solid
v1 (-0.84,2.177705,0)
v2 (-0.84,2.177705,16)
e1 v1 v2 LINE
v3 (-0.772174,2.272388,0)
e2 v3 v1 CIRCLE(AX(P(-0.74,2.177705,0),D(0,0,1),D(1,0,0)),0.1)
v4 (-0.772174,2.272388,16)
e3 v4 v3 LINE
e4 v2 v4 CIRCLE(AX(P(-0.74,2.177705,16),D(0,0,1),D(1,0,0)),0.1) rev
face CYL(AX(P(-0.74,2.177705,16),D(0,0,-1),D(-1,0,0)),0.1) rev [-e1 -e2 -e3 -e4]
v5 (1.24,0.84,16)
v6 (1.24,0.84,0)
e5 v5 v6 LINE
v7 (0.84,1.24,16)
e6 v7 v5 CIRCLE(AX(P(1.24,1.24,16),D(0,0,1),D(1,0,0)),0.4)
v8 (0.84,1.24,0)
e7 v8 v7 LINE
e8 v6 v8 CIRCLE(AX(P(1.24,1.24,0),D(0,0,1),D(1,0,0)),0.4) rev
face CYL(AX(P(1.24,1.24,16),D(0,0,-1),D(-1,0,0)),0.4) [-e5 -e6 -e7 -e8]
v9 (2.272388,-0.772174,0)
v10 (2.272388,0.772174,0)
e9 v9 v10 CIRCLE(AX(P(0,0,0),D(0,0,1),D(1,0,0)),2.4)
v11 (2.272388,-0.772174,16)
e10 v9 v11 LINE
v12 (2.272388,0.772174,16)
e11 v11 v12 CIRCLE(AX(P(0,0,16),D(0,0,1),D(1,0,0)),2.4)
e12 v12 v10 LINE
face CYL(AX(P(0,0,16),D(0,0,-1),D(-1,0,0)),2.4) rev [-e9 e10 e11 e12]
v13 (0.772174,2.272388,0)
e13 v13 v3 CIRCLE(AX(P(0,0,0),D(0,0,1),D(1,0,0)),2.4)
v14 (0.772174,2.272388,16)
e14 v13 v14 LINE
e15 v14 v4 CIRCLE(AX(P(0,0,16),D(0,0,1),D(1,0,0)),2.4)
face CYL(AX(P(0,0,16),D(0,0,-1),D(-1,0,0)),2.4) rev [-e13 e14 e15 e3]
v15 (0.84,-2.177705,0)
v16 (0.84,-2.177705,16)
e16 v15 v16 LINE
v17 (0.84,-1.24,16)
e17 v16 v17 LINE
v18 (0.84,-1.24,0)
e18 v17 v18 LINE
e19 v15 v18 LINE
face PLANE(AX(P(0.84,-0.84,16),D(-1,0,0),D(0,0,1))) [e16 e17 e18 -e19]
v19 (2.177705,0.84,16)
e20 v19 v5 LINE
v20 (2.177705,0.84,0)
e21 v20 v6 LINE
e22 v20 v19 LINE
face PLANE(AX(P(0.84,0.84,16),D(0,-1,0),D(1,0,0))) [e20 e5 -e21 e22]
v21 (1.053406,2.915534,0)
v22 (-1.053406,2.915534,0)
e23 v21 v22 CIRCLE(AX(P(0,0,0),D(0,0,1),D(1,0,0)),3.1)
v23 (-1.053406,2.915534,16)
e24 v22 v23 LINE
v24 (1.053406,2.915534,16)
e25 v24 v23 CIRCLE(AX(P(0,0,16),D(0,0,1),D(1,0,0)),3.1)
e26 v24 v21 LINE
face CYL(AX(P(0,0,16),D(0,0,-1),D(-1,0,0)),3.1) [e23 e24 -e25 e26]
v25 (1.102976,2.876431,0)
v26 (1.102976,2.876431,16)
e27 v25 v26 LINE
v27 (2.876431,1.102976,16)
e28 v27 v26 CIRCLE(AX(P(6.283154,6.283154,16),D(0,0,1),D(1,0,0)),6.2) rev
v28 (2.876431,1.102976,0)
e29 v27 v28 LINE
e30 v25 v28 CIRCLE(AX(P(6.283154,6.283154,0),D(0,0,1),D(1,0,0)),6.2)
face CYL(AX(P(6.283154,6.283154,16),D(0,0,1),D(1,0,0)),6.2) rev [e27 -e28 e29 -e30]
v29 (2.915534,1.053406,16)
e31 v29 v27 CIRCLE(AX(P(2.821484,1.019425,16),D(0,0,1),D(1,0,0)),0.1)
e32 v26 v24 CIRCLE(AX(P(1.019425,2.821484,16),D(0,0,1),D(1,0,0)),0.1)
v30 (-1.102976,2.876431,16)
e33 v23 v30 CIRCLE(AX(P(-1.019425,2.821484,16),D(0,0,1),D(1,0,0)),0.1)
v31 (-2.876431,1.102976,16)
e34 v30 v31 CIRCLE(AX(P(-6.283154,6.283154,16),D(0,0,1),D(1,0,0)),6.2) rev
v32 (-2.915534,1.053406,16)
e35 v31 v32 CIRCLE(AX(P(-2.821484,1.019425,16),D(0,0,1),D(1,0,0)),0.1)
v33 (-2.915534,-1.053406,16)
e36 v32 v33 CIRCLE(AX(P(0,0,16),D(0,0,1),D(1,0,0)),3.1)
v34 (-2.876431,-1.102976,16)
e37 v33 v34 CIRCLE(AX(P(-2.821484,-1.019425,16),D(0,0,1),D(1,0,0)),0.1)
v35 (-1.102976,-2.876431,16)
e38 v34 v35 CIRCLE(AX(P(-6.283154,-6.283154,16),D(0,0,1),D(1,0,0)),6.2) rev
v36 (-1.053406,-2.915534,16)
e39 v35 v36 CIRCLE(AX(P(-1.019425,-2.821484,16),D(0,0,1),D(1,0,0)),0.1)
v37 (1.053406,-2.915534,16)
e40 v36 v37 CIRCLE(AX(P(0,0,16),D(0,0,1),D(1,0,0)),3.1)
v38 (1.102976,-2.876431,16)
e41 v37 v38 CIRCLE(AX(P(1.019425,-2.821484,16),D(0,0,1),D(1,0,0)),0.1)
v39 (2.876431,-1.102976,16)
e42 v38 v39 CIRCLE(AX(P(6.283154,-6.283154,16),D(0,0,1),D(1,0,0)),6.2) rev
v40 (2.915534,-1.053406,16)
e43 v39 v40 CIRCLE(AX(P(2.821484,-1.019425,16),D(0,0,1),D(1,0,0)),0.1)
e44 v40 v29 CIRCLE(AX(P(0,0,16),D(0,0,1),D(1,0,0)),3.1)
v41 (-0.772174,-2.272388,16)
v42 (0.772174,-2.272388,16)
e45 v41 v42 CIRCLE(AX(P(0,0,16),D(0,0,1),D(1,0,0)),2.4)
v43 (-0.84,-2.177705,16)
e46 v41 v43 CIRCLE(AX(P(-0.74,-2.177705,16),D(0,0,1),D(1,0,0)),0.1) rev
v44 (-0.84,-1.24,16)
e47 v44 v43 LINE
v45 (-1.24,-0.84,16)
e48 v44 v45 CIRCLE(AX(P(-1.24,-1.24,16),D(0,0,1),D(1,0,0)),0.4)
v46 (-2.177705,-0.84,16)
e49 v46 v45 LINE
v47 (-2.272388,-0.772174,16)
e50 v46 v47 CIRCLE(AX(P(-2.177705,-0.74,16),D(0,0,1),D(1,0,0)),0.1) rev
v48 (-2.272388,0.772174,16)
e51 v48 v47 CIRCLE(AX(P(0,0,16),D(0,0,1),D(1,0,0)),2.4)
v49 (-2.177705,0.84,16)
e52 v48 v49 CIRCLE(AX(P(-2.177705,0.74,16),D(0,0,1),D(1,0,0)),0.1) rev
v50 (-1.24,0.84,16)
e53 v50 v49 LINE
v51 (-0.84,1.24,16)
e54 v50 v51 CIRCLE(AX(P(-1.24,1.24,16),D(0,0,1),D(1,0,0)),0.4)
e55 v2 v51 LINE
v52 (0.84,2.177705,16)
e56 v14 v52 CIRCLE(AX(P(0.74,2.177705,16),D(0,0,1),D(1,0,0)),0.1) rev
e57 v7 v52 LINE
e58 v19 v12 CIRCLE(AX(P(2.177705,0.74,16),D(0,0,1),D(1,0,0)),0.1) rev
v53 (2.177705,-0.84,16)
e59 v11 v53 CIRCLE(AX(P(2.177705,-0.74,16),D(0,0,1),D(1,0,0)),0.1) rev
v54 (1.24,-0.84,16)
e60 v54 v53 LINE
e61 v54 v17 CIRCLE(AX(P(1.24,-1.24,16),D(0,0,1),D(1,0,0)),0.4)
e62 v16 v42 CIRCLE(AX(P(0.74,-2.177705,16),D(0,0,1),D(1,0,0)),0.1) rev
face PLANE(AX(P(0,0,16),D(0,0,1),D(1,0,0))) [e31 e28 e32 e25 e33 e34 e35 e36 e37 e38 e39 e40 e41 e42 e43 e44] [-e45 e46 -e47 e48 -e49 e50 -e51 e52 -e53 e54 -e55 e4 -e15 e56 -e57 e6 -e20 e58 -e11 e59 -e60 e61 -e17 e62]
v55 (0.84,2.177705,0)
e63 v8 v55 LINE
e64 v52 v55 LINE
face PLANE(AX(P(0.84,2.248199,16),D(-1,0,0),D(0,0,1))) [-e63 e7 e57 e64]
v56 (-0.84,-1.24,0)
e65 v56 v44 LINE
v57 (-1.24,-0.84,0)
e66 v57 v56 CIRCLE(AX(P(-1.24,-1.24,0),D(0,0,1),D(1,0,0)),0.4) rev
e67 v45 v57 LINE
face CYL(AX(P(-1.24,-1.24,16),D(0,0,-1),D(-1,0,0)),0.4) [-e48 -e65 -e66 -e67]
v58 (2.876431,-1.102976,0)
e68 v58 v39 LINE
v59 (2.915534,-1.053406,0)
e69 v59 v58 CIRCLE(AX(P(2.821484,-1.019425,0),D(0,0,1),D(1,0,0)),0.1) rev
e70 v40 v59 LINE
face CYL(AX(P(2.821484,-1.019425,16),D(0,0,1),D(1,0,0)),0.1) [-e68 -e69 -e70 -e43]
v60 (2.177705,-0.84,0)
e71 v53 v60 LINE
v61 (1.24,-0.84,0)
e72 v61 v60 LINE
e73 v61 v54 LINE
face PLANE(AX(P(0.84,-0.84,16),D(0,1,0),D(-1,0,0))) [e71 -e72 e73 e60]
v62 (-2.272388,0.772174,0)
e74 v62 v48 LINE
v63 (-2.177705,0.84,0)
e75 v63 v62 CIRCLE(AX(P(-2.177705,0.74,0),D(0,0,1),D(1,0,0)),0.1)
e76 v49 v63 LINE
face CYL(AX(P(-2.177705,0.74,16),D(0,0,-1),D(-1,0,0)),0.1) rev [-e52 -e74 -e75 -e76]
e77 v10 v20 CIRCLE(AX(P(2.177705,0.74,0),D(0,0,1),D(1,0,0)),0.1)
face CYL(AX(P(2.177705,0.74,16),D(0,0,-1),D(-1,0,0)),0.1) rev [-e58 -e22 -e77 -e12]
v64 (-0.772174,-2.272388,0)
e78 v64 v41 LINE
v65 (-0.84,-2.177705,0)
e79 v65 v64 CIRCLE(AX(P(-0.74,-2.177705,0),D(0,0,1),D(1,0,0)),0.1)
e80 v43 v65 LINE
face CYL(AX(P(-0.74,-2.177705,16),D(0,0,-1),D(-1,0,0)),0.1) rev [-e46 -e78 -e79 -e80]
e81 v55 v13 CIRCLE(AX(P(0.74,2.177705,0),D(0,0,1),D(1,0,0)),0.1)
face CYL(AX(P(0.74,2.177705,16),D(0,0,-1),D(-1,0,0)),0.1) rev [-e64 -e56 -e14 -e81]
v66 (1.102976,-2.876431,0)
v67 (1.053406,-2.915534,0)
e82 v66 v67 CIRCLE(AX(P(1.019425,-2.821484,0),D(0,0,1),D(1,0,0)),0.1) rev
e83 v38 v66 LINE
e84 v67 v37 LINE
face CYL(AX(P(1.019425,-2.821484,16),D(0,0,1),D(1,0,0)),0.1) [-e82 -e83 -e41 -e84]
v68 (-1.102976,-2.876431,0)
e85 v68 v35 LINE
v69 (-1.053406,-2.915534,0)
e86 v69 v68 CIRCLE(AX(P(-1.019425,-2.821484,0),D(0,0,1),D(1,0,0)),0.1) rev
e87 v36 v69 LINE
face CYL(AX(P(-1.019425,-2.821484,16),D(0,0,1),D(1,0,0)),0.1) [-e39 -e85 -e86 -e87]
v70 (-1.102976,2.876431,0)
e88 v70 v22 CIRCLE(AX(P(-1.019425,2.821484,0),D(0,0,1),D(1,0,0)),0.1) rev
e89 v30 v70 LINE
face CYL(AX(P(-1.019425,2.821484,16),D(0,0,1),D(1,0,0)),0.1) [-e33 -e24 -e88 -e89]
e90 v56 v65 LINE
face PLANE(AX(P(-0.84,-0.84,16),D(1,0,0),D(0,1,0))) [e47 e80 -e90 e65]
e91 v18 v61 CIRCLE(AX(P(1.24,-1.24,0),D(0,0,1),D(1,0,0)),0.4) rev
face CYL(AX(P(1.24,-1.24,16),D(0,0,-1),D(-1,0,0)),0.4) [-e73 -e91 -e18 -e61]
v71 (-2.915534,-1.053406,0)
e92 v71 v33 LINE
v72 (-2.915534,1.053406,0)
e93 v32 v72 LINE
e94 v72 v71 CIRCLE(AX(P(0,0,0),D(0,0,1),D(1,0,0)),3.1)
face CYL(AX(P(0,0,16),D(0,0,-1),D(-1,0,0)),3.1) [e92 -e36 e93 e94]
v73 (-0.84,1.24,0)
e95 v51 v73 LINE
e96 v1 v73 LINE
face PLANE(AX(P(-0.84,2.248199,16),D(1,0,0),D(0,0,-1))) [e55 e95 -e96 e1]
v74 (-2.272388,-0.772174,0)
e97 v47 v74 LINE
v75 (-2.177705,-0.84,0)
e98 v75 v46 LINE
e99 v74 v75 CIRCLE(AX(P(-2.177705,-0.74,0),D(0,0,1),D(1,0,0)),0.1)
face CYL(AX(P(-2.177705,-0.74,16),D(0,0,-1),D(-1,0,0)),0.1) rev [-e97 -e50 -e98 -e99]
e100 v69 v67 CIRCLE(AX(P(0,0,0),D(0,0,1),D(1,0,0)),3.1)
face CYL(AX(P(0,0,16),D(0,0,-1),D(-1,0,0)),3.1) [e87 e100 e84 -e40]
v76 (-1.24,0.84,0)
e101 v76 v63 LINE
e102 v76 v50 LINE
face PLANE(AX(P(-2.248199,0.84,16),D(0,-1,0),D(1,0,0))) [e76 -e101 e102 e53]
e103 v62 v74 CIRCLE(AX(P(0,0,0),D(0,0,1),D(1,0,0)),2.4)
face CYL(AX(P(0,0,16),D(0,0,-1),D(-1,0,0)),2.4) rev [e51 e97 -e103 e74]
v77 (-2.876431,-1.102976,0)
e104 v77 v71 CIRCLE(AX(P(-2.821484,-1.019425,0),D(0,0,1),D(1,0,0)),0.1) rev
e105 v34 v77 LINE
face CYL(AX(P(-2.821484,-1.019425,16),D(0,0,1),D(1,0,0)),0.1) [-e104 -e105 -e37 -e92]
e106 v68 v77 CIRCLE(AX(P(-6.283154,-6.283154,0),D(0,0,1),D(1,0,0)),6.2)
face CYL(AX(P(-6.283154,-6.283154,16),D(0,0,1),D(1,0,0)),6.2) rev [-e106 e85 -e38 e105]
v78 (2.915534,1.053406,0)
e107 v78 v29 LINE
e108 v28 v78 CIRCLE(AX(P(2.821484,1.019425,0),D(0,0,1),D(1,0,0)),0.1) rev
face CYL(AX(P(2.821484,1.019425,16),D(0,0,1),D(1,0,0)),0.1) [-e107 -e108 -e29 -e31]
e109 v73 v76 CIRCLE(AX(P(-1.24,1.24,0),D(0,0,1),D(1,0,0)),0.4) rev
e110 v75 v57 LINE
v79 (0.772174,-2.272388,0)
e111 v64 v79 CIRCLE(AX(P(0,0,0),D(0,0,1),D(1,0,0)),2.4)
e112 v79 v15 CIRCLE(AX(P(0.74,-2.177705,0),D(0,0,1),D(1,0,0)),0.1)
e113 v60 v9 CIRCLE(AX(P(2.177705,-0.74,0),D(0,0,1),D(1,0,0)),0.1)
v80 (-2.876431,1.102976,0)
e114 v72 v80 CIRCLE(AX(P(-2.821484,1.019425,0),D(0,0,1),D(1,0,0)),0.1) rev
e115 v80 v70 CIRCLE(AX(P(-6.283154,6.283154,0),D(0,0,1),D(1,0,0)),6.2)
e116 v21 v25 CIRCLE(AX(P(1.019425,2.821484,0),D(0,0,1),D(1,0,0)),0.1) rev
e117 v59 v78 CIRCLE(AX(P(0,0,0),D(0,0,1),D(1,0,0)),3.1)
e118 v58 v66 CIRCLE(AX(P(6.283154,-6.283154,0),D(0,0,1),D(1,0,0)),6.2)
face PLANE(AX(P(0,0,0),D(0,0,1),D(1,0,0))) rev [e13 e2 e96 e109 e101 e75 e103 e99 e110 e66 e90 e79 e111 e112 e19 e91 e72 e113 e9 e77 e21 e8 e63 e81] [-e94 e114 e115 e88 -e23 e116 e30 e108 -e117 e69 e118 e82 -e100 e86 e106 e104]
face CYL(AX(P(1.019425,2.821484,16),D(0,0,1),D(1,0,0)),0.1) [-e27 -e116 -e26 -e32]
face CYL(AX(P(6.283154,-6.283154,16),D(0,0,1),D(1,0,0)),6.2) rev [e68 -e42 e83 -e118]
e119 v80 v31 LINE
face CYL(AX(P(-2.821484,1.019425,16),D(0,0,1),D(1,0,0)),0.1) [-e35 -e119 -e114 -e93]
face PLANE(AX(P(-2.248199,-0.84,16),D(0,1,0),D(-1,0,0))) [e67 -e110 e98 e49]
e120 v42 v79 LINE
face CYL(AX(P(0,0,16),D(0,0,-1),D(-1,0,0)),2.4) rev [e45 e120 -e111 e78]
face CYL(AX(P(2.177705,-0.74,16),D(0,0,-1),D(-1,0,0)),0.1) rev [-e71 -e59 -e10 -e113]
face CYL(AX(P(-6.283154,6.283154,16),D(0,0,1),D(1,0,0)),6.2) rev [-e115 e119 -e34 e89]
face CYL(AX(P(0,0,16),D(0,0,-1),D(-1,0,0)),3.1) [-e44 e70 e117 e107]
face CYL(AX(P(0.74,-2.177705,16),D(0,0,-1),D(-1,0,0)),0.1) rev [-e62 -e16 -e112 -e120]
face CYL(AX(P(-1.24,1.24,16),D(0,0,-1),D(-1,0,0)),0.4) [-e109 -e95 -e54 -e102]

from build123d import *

# Parameters (mm, degrees)
BOSS_EXTRUDE1_DEPTH = 16
CUT_EXTRUDE1_DEPTH  = 16
FILLET1_R           = 0.4
FILLET2_R           = 0.4
FILLET3_R           = 0.4
FILLET4_R           = 0.4
FILLET5_R           = 6.2
FILLET6_R           = 6.2
FILLET7_R           = 6.2
FILLET8_R           = 6.2
FILLET9_R           = 0.1
FILLET10_R          = 0.1
FILLET11_R          = 0.1
FILLET12_R          = 0.1
FILLET13_R          = 0.1
FILLET14_R          = 0.1
FILLET15_R          = 0.1
FILLET16_R          = 0.1
FILLET17_R          = 0.1
FILLET18_R          = 0.1
FILLET19_R          = 0.1
FILLET20_R          = 0.1
FILLET21_R          = 0.1
FILLET22_R          = 0.1
FILLET23_R          = 0.1
FILLET24_R          = 0.1


with BuildPart() as part:
    # Sketch1 → Boss-Extrude1 (new body)
    with BuildSketch(Plane.XY):
        with BuildLine():
            Line((-1.085, -1.085), (-1.085, -2.903924069))
            ThreePointArc((-1.085, -2.903924069), (0, -3.1), (1.085, -2.903924069))
            Line((1.085, -2.903924069), (1.085, -1.085))
            Line((1.085, -1.085), (2.903924069, -1.085))
            ThreePointArc((2.903924069, -1.085), (3.1, 0), (2.903924069, 1.085))
            Line((2.903924069, 1.085), (1.085, 1.085))
            Line((1.085, 1.085), (1.085, 2.903924069))
            ThreePointArc((1.085, 2.903924069), (0, 3.1), (-1.085, 2.903924069))
            Line((-1.085, 2.903924069), (-1.085, 1.085))
            Line((-1.085, 1.085), (-2.903924069, 1.085))
            ThreePointArc((-2.903924069, 1.085), (-3.1, 0), (-2.903924069, -1.085))
            Line((-2.903924069, -1.085), (-1.085, -1.085))
        make_face()
    extrude(amount=BOSS_EXTRUDE1_DEPTH)

    # Sketch2 → Cut-Extrude1 (cut)
    with BuildSketch(Plane.XY):
        with BuildLine():
            Line((0.84, -0.84), (2.248199279, -0.84))
            ThreePointArc((2.248199279, -0.84), (2.4, 0), (2.248199279, 0.84))
            Line((2.248199279, 0.84), (0.84, 0.84))
            Line((0.84, 0.84), (0.84, 2.248199279))
            ThreePointArc((0.84, 2.248199279), (0, 2.4), (-0.84, 2.248199279))
            Line((-0.84, 2.248199279), (-0.84, 0.84))
            Line((-0.84, 0.84), (-2.248199279, 0.84))
            ThreePointArc((-2.248199279, 0.84), (-2.4, 0), (-2.248199279, -0.84))
            Line((-2.248199279, -0.84), (-0.84, -0.84))
            Line((-0.84, -0.84), (-0.84, -2.248199279))
            ThreePointArc((-0.84, -2.248199279), (0, -2.4), (0.84, -2.248199279))
            Line((0.84, -2.248199279), (0.84, -0.84))
        make_face()
    extrude(amount=CUT_EXTRUDE1_DEPTH, mode=Mode.SUBTRACT)

    # Fillet1
    fillet1_edges = [part.edges().sort_by_distance(p)[0] for p in [
        (-0.84, 0.84, 8),
    ]]
    fillet(fillet1_edges, radius=FILLET1_R)

    # Fillet2
    fillet2_edges = [part.edges().sort_by_distance(p)[0] for p in [
        (0.84, 0.84, 8),
    ]]
    fillet(fillet2_edges, radius=FILLET2_R)

    # Fillet3
    fillet3_edges = [part.edges().sort_by_distance(p)[0] for p in [
        (0.84, -0.84, 8),
    ]]
    fillet(fillet3_edges, radius=FILLET3_R)

    # Fillet4
    fillet4_edges = [part.edges().sort_by_distance(p)[0] for p in [
        (-0.84, -0.84, 8),
    ]]
    fillet(fillet4_edges, radius=FILLET4_R)

    # Fillet5
    # the kernel refuses this fillet: 6.2 mm, written as the material it adds along each edge
    with BuildSketch(Plane(origin=(-1.085, 1.085, 0), x_dir=(-1, 0, 0), z_dir=(0, 0, 1))) as fillet5_piece_1:
        with BuildLine():
            CenterArc((5.198154004, -5.198154004), FILLET5_R, 123.027198012, 23.945603977)
            Line((0, -1.818924069), (0, 0))
            Line((0, 0), (1.818924069, 0))
        make_face()
    extrude(amount=16)

    # Fillet6
    # the kernel refuses this fillet: 6.2 mm, written as the material it adds along each edge
    with BuildSketch(Plane(origin=(-1.085, -1.085, 0), x_dir=(-1, 0, 0), z_dir=(0, 0, 1))) as fillet6_piece_1:
        with BuildLine():
            CenterArc((5.198154004, 5.198154004), FILLET6_R, 213.027198012, 23.945603977)
            Line((0, 1.818924069), (0, 0))
            Line((0, 0), (1.818924069, 0))
        make_face()
    extrude(amount=16)

    # Fillet7
    # the kernel refuses this fillet: 6.2 mm, written as the material it adds along each edge
    with BuildSketch(Plane(origin=(1.085, -1.085, 0), x_dir=(0, -1, 0), z_dir=(0, 0, 1))) as fillet7_piece_1:
        with BuildLine():
            CenterArc((5.198154004, 5.198154004), FILLET7_R, 213.027198012, 23.945603977)
            Line((0, 1.818924069), (0, 0))
            Line((0, 0), (1.818924069, 0))
        make_face()
    extrude(amount=16)

    # Fillet8
    # the kernel refuses this fillet: 6.2 mm, written as the material it adds along each edge
    with BuildSketch(Plane(origin=(1.085, 1.085, 0), x_dir=(1, 0, 0), z_dir=(0, 0, 1))) as fillet8_piece_1:
        with BuildLine():
            CenterArc((5.198154004, 5.198154004), FILLET8_R, 213.027198012, 23.945603977)
            Line((0, 1.818924069), (0, 0))
            Line((0, 0), (1.818924069, 0))
        make_face()
    extrude(amount=16)

    # Fillet9
    fillet9_edges = [part.edges().sort_by_distance(p)[0] for p in [
        (0.84, 2.248199279, 8),
    ]]
    fillet(fillet9_edges, radius=FILLET9_R)

    # Fillet10
    fillet10_edges = [part.edges().sort_by_distance(p)[0] for p in [
        (1.085, 2.903924069, 8),
    ]]
    fillet(fillet10_edges, radius=FILLET10_R)

    # Fillet11
    fillet11_edges = [part.edges().sort_by_distance(p)[0] for p in [
        (-1.085, 2.903924069, 8),
    ]]
    fillet(fillet11_edges, radius=FILLET11_R)

    # Fillet12
    fillet12_edges = [part.edges().sort_by_distance(p)[0] for p in [
        (-2.903924069, 1.085, 8),
    ]]
    fillet(fillet12_edges, radius=FILLET12_R)

    # Fillet13
    fillet13_edges = [part.edges().sort_by_distance(p)[0] for p in [
        (-2.903924069, -1.085, 8),
    ]]
    fillet(fillet13_edges, radius=FILLET13_R)

    # Fillet14
    fillet14_edges = [part.edges().sort_by_distance(p)[0] for p in [
        (-1.085, -2.903924069, 8),
    ]]
    fillet(fillet14_edges, radius=FILLET14_R)

    # Fillet15
    fillet15_edges = [part.edges().sort_by_distance(p)[0] for p in [
        (1.085, -2.903924069, 8),
    ]]
    fillet(fillet15_edges, radius=FILLET15_R)

    # Fillet16
    fillet16_edges = [part.edges().sort_by_distance(p)[0] for p in [
        (2.903924069, -1.085, 8),
    ]]
    fillet(fillet16_edges, radius=FILLET16_R)

    # Fillet17
    fillet17_edges = [part.edges().sort_by_distance(p)[0] for p in [
        (2.903924069, 1.085, 8),
    ]]
    fillet(fillet17_edges, radius=FILLET17_R)

    # Fillet18
    fillet18_edges = [part.edges().sort_by_distance(p)[0] for p in [
        (0.84, -2.248199279, 8),
    ]]
    fillet(fillet18_edges, radius=FILLET18_R)

    # Fillet19
    fillet19_edges = [part.edges().sort_by_distance(p)[0] for p in [
        (-0.84, -2.248199279, 8),
    ]]
    fillet(fillet19_edges, radius=FILLET19_R)

    # Fillet20
    fillet20_edges = [part.edges().sort_by_distance(p)[0] for p in [
        (-2.248199279, 0.84, 8),
    ]]
    fillet(fillet20_edges, radius=FILLET20_R)

    # Fillet21
    fillet21_edges = [part.edges().sort_by_distance(p)[0] for p in [
        (-2.248199279, -0.84, 8),
    ]]
    fillet(fillet21_edges, radius=FILLET21_R)

    # Fillet22
    fillet22_edges = [part.edges().sort_by_distance(p)[0] for p in [
        (-0.84, 2.248199279, 8),
    ]]
    fillet(fillet22_edges, radius=FILLET22_R)

    # Fillet23
    fillet23_edges = [part.edges().sort_by_distance(p)[0] for p in [
        (2.248199279, -0.84, 8),
    ]]
    fillet(fillet23_edges, radius=FILLET23_R)

    # Fillet24
    fillet24_edges = [part.edges().sort_by_distance(p)[0] for p in [
        (2.248199279, 0.84, 8),
    ]]
    fillet(fillet24_edges, radius=FILLET24_R)


solid = part.part
